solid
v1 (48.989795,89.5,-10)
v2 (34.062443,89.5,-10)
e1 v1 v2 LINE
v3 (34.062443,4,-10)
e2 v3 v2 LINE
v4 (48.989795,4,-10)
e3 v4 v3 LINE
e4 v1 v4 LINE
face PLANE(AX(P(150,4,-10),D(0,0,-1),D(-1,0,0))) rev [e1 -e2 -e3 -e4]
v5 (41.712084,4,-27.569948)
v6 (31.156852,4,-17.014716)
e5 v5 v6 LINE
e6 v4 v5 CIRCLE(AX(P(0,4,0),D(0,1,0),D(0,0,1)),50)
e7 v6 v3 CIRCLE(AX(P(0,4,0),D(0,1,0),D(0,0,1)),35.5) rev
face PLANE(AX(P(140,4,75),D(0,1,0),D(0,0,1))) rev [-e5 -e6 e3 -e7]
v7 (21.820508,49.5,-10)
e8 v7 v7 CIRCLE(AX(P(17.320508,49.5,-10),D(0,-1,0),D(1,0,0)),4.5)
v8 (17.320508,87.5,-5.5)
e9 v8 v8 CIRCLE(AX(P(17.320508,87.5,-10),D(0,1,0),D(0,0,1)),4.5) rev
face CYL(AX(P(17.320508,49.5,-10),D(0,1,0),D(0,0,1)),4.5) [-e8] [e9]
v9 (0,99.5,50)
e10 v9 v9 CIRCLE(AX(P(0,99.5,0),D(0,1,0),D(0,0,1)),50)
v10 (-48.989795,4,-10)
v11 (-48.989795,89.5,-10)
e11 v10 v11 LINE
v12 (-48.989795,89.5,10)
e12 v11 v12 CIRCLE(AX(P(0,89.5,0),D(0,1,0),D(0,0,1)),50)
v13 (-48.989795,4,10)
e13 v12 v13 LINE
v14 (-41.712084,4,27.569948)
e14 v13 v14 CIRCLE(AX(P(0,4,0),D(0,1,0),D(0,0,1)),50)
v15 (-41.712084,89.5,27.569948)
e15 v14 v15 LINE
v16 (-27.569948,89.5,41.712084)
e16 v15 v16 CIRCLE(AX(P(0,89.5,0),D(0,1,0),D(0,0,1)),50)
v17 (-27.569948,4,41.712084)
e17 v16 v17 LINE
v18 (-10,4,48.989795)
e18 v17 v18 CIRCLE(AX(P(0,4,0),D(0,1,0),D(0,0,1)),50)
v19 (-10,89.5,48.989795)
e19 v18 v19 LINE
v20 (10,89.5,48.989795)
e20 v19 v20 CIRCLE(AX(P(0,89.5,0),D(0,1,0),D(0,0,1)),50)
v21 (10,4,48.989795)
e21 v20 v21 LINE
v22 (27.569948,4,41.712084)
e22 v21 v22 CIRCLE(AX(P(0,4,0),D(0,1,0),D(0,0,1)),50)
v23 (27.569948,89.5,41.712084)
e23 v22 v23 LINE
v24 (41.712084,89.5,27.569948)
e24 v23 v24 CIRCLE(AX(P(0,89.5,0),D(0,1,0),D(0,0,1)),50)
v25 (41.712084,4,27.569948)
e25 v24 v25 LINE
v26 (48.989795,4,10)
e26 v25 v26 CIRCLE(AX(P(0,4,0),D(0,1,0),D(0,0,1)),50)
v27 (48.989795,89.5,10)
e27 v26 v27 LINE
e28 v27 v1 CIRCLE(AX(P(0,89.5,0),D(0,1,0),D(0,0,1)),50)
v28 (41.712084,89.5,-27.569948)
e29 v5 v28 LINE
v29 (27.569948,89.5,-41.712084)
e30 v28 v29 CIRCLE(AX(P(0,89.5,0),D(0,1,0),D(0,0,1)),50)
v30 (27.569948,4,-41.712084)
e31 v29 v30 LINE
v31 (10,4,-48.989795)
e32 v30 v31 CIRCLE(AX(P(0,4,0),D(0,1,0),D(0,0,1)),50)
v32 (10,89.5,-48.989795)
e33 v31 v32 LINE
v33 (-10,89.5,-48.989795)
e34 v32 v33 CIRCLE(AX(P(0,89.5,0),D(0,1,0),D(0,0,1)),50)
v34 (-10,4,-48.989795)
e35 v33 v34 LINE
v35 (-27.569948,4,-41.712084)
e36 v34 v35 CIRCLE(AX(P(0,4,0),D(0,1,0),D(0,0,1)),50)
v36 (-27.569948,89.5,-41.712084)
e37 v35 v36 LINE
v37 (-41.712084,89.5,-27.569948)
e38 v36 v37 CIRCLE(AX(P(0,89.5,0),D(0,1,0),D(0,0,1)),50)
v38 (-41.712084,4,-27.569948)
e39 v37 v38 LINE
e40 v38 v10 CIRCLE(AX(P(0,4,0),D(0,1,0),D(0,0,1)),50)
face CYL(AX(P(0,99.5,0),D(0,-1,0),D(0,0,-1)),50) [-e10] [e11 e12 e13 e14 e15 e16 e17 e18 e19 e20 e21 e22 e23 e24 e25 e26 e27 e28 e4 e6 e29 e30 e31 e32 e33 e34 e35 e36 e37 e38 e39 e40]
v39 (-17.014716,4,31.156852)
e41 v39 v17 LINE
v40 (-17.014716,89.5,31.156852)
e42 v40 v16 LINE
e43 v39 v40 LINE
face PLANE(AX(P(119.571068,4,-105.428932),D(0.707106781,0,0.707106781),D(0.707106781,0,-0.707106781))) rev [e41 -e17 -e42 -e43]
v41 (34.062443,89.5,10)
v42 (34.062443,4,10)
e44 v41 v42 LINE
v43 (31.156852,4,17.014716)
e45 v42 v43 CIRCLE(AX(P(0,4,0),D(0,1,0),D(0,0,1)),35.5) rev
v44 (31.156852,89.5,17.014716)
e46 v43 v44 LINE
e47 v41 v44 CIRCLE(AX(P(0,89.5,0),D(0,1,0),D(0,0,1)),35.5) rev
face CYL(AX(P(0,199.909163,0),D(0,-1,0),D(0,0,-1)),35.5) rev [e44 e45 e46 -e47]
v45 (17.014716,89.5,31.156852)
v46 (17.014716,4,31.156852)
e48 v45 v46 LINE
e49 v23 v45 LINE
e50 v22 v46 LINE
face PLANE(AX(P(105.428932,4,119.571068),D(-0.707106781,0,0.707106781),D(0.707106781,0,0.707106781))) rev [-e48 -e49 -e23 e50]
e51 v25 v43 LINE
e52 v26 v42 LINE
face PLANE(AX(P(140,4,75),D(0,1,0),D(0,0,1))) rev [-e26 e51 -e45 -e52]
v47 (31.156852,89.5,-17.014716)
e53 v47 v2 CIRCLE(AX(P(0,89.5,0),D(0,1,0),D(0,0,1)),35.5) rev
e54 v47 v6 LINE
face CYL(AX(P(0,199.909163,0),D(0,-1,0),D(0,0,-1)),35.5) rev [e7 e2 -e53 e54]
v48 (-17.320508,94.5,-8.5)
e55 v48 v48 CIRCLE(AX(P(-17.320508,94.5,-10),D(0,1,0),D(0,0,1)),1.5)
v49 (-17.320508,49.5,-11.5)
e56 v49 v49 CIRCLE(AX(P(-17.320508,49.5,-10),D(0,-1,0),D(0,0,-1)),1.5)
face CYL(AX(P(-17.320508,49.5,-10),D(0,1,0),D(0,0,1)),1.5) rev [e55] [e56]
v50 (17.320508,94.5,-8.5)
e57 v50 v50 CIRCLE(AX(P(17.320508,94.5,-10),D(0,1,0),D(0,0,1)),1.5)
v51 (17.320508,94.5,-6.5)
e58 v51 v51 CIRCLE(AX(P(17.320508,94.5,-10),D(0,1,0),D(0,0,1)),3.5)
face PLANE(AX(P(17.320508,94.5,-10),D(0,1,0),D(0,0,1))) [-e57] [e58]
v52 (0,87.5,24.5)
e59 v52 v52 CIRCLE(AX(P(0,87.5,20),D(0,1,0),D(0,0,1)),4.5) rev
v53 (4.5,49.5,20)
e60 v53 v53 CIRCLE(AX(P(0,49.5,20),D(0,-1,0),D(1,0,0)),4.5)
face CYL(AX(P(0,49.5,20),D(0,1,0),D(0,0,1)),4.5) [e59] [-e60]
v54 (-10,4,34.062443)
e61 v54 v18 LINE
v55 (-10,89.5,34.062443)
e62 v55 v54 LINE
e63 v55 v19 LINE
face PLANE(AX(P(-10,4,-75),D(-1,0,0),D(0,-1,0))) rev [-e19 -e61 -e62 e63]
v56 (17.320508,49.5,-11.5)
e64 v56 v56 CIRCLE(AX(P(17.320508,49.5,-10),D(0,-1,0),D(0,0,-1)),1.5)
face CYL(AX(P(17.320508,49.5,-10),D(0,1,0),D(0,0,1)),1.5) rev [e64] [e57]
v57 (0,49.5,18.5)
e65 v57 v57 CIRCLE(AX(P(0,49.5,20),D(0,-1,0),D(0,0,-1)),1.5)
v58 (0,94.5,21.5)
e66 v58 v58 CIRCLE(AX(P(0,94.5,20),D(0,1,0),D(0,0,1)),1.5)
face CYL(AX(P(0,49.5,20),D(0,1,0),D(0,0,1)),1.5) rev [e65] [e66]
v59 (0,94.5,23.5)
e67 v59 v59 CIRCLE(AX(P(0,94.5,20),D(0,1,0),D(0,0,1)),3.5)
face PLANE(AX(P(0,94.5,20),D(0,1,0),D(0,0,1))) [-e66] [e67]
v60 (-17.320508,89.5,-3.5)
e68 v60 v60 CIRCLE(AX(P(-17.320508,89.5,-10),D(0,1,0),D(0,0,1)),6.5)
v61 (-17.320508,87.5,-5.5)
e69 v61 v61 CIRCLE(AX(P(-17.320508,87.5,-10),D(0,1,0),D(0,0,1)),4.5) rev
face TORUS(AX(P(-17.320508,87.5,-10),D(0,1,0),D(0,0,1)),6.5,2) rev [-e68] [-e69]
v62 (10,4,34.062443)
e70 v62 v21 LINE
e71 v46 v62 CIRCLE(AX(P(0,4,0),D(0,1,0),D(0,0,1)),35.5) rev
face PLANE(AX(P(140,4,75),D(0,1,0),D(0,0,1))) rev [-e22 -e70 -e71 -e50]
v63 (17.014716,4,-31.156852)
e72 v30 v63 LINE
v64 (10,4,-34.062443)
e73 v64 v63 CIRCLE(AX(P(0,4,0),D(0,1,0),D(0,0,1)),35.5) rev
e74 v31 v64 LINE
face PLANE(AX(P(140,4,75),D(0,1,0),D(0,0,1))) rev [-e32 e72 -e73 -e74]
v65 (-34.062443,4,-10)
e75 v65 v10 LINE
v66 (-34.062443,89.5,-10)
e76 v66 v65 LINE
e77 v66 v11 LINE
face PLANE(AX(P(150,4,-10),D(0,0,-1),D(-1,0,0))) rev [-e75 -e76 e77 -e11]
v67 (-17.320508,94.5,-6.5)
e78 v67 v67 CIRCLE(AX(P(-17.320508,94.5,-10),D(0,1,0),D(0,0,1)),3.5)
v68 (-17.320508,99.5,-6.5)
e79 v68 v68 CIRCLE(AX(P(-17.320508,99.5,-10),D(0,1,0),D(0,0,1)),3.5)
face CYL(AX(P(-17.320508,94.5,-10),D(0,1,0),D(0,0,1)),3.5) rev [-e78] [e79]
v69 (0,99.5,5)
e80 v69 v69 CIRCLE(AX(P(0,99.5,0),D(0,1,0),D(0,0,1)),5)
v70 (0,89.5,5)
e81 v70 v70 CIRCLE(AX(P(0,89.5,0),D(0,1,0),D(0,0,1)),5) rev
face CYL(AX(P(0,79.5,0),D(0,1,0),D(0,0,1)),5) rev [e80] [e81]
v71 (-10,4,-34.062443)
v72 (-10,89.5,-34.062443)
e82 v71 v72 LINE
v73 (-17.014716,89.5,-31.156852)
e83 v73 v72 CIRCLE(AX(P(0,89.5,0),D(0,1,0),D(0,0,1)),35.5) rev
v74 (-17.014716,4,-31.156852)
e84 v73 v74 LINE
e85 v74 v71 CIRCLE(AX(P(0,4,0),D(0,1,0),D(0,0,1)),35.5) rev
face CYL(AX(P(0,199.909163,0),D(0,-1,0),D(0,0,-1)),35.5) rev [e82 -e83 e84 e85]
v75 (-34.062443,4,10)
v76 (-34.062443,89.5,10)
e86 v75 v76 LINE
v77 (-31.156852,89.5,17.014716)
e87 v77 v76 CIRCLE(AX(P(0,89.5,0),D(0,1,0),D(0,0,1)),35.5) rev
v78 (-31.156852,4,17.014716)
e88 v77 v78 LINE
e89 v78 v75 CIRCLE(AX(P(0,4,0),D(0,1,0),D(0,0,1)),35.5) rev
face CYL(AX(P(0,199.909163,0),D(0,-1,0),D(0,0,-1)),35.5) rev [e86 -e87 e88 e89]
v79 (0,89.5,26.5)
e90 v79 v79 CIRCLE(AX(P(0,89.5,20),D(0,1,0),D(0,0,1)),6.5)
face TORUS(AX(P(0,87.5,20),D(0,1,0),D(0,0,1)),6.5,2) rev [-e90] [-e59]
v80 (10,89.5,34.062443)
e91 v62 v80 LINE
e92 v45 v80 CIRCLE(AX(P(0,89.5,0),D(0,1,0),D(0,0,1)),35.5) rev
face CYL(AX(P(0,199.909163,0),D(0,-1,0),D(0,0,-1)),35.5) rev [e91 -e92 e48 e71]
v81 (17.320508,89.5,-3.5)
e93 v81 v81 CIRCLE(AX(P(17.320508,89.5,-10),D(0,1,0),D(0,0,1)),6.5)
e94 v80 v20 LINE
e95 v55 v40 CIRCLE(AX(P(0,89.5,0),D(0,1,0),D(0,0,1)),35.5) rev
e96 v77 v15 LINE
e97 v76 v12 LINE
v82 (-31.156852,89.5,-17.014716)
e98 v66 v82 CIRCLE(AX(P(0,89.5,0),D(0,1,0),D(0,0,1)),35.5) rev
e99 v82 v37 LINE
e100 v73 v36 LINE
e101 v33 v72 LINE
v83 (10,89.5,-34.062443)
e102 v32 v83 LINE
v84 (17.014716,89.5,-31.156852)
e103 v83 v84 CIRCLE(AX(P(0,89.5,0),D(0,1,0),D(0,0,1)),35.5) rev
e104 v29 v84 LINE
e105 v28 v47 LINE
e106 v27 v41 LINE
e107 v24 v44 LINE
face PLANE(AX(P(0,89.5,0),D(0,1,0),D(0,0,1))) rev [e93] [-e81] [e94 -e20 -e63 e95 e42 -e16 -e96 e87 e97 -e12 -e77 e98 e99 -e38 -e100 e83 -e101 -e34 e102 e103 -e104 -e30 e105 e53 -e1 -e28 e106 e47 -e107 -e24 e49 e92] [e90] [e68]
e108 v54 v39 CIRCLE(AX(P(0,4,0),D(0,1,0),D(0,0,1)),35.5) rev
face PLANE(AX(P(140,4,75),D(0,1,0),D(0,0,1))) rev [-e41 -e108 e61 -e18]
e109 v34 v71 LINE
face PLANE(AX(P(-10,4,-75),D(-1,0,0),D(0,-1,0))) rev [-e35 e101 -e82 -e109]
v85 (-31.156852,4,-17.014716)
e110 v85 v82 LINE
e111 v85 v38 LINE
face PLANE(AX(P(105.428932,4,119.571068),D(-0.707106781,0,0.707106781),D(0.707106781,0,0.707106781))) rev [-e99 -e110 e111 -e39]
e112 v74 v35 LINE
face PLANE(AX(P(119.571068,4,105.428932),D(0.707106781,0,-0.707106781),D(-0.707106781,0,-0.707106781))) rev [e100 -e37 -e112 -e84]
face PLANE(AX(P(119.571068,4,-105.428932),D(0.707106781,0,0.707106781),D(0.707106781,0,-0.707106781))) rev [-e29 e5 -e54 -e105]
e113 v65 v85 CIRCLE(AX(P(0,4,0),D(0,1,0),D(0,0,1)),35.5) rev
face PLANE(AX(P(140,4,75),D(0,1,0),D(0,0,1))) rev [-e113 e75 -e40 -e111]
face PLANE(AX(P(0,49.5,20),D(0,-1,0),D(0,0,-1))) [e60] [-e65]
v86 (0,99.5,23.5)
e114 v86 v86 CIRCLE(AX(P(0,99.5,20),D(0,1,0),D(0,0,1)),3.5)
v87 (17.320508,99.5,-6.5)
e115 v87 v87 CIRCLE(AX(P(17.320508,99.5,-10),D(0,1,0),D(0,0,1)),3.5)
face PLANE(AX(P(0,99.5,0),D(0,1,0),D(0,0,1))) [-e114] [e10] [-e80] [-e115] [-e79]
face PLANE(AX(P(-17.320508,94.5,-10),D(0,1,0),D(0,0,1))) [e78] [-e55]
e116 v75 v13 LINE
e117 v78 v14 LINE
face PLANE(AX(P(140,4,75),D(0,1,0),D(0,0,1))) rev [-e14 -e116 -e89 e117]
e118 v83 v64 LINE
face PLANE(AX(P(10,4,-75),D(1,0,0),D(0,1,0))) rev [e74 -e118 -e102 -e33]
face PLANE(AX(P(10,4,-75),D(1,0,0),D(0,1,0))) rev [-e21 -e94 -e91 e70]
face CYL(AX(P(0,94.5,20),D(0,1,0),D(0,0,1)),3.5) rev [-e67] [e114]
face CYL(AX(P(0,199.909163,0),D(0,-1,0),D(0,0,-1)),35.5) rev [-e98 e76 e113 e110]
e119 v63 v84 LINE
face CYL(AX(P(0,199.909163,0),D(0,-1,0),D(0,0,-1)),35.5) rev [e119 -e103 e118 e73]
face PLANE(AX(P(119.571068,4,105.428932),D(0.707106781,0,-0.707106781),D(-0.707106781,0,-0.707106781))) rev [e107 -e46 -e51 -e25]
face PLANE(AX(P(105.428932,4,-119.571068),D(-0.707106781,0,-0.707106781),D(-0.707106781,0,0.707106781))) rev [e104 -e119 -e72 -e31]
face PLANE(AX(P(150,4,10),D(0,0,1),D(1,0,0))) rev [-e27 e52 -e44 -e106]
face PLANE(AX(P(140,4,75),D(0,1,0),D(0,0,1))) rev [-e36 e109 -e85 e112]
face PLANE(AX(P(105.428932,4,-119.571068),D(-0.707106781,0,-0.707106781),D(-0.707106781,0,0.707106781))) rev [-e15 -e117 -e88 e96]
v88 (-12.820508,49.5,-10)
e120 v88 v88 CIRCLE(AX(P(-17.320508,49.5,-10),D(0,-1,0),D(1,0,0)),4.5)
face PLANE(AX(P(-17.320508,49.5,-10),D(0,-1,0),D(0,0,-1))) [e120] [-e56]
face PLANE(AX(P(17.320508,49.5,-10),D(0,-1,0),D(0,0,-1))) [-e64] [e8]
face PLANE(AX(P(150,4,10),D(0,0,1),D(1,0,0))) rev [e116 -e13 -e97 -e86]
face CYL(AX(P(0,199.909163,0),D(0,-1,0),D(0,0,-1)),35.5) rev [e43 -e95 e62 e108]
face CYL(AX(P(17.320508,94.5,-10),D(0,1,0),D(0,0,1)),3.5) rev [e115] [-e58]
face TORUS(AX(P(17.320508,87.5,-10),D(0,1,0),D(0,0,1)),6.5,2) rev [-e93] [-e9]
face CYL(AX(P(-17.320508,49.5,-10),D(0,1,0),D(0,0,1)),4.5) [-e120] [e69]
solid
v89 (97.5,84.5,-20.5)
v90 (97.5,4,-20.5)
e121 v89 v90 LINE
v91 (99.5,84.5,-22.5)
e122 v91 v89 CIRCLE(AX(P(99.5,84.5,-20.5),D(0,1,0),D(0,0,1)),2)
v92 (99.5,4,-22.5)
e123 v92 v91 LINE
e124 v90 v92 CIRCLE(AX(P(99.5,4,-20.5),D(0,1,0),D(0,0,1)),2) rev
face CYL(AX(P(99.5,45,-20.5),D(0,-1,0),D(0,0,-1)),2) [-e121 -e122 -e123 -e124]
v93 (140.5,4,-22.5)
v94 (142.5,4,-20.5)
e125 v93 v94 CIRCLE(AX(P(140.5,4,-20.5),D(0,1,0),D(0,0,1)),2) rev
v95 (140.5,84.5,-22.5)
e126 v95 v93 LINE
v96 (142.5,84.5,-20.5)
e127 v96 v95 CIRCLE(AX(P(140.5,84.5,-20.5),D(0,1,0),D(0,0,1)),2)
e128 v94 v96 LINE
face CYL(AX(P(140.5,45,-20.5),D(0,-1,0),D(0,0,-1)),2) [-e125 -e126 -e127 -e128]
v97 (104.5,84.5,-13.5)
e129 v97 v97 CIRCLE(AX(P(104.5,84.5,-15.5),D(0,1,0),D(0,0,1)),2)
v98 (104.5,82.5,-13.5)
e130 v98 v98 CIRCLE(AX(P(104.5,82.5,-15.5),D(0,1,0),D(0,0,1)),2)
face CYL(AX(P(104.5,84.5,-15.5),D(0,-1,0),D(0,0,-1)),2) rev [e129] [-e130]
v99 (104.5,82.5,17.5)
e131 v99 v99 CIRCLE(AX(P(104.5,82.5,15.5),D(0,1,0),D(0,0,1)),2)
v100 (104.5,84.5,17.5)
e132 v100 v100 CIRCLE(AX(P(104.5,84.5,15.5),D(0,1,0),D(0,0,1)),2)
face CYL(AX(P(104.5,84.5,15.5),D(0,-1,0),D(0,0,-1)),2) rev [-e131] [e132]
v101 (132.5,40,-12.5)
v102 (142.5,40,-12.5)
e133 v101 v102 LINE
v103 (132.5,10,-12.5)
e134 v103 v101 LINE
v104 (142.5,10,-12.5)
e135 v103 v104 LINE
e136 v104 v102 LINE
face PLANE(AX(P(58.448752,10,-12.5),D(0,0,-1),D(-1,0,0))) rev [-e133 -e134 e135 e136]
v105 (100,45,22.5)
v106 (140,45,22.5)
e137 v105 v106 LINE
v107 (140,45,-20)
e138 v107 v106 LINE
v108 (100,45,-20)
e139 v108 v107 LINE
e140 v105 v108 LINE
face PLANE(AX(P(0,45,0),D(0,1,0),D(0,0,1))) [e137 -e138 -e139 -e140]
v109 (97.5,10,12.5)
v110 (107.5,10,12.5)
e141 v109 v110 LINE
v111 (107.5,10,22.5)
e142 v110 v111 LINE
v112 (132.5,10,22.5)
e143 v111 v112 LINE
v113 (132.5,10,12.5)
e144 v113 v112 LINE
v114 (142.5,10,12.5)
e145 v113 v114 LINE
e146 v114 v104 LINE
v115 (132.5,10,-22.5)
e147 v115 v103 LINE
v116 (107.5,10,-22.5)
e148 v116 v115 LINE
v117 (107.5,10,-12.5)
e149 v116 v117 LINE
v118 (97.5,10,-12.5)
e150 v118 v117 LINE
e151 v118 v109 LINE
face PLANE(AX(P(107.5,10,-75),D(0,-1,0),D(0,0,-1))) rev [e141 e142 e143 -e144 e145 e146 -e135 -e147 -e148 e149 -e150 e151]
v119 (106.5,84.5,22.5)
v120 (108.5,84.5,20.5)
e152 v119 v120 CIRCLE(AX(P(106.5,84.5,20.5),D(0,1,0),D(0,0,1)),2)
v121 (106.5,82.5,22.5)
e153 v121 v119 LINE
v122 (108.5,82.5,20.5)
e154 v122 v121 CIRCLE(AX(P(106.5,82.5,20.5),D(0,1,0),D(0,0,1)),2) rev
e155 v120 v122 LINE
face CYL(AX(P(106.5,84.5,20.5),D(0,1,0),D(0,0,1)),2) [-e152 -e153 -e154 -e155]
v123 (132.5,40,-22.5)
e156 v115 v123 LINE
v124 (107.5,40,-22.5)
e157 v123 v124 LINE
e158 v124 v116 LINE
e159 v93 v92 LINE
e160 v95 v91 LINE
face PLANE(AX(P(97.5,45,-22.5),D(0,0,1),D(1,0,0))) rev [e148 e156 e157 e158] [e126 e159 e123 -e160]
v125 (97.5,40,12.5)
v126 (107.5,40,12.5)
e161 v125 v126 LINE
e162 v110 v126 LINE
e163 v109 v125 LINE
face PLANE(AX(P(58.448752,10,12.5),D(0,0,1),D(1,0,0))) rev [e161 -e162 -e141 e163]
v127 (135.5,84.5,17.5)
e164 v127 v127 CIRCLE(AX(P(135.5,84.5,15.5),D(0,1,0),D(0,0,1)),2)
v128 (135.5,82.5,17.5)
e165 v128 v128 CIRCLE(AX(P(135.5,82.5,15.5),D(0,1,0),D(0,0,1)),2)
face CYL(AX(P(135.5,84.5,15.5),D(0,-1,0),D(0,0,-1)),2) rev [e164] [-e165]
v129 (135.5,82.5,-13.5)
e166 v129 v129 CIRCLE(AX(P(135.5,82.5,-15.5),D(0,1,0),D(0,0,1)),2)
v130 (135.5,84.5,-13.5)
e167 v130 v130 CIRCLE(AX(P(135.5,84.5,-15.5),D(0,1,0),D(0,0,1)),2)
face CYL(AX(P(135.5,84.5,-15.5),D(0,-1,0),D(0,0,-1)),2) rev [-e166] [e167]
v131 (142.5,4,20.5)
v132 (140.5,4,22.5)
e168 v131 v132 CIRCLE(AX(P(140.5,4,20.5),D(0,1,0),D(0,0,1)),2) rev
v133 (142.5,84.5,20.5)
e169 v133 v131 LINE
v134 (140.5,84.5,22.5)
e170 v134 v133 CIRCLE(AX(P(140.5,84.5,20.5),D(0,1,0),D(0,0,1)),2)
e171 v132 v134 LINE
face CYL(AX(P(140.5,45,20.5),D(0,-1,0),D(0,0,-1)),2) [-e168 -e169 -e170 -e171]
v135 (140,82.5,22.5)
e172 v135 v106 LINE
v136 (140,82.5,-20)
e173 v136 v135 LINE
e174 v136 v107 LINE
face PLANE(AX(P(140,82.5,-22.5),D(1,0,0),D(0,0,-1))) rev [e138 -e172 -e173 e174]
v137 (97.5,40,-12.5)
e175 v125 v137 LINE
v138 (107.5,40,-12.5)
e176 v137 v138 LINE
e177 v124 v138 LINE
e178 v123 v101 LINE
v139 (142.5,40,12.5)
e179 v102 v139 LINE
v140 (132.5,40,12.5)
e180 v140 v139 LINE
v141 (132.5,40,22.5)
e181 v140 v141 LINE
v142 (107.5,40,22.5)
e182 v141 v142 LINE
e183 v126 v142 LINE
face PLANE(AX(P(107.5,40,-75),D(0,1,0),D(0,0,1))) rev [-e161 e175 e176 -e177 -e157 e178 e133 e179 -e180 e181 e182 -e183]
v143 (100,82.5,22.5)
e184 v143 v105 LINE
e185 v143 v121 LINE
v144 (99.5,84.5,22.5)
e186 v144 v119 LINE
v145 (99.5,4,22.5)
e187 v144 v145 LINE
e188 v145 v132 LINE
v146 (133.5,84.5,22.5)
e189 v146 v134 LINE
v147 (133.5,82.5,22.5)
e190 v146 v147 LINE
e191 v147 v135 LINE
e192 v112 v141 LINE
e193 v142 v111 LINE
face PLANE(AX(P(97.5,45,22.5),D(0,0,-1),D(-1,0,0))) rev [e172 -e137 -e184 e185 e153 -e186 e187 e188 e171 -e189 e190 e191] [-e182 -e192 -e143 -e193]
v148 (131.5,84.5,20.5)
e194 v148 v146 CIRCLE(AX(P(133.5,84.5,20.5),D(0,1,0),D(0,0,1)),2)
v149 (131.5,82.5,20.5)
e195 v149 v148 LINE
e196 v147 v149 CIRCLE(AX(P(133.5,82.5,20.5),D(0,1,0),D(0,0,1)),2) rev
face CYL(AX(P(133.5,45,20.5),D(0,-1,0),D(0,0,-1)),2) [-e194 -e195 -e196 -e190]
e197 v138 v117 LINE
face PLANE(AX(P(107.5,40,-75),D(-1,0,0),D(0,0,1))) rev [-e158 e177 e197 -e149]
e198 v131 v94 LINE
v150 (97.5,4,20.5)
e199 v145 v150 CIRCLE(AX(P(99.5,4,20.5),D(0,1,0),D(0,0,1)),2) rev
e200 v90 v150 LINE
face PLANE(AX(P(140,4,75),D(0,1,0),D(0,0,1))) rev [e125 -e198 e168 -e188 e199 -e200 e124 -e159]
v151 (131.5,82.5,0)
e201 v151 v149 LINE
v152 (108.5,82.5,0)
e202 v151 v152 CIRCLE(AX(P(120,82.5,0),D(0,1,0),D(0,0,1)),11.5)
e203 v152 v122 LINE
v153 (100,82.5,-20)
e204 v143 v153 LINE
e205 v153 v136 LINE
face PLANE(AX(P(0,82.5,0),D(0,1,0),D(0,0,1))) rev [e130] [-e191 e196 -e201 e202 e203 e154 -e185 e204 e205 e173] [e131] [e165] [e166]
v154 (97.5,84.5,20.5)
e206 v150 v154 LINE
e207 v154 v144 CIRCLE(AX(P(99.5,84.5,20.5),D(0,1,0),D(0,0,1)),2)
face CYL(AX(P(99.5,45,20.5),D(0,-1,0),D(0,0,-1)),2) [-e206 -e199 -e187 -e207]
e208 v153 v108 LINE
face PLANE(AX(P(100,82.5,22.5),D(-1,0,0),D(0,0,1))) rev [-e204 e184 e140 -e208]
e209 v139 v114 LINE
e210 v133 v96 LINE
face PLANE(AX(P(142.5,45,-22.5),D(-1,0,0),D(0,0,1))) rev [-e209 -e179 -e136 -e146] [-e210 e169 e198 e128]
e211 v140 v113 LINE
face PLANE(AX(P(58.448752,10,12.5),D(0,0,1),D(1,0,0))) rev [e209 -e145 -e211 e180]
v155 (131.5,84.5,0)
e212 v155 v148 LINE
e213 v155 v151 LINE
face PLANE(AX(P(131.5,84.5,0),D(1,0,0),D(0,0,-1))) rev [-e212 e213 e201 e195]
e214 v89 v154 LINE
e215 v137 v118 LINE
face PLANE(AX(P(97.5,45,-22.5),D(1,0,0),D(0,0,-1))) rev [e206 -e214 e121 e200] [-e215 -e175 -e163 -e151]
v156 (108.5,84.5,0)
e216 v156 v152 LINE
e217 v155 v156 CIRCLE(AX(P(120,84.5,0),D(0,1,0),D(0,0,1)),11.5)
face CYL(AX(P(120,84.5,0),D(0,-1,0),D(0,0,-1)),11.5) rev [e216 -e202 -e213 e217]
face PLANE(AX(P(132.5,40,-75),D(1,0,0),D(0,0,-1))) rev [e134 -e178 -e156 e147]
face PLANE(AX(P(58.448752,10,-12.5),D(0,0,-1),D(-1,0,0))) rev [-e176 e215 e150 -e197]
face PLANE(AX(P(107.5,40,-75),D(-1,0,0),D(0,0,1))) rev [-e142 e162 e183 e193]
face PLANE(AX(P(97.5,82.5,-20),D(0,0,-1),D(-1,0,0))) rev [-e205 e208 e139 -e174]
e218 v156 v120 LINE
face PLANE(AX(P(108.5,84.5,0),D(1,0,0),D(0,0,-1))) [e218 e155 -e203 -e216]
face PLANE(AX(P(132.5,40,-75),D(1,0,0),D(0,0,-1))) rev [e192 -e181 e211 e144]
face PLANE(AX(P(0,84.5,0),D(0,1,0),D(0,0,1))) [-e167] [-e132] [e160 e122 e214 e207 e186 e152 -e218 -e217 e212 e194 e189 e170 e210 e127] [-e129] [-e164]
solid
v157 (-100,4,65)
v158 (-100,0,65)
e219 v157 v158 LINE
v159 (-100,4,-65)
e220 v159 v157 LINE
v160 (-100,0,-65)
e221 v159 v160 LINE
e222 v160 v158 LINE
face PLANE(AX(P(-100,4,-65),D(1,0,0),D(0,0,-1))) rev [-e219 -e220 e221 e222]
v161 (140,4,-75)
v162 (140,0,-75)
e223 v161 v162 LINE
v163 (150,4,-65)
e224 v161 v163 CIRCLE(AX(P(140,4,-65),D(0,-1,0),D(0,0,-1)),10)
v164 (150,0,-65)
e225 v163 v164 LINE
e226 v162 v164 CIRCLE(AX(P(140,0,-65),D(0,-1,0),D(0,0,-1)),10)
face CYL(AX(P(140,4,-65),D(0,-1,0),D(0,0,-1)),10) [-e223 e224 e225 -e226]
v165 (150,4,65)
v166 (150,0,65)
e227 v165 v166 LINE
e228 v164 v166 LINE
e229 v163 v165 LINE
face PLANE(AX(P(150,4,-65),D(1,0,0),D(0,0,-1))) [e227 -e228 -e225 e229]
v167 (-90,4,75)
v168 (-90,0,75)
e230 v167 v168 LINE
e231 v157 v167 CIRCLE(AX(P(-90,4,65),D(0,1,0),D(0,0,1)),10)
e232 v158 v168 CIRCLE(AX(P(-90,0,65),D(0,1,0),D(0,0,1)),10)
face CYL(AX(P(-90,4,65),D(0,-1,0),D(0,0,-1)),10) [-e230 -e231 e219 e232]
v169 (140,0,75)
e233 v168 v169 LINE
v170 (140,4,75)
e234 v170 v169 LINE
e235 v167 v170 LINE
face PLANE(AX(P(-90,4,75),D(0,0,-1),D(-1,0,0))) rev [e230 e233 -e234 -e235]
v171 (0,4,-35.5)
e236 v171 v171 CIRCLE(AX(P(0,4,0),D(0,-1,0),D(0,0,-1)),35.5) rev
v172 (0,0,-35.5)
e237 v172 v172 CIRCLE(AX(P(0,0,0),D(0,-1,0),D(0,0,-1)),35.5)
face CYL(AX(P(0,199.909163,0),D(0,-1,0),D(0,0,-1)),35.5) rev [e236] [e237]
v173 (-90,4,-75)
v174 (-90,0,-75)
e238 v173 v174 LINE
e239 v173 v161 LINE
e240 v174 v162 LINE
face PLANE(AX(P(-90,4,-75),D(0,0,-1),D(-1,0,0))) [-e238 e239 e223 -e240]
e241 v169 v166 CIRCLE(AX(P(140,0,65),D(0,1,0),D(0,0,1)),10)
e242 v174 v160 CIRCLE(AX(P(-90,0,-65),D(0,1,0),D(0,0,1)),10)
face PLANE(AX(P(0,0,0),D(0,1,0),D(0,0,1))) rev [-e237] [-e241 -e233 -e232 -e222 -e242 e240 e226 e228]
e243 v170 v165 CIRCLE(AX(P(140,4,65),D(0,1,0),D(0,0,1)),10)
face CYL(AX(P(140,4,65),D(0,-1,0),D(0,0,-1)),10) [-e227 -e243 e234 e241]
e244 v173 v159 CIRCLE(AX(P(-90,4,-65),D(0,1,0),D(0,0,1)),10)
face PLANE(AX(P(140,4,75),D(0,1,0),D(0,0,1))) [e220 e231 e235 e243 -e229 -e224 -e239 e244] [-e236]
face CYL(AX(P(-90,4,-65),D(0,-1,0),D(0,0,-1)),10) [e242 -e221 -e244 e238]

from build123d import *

# Parameters (mm, degrees)
SKETCH1_R            = 50
BOSS_EXTRUDE1_DEPTH  = 99.5
BOSS_EXTRUDE2_DEPTH  = 4
SKETCH3_R            = 5
CUT_EXTRUDE1_DEPTH   = 20
SKETCH6_R            = 35.5
CUT_EXTRUDE2_DEPTH   = 89.5
SKETCH7_W            = 20
SKETCH7_H            = 85.5
CUT_EXTRUDE3_DEPTH   = 196.000641025
CIRPATTERN1_COUNT    = 8
SKETCH8_R            = 4.5
SKETCH8_R_2          = 1.5
EXTRUDE_THIN1_DEPTH  = 40
SKETCH8_2_R          = 1.5
CUT_EXTRUDE4_DEPTH   = 191.092740524
SKETCH9_R            = 3.5
CUT_EXTRUDE5_DEPTH   = 5
FILLET1_R            = 2
SKETCH4_W            = 45
SKETCH4_H            = 45
BOSS_EXTRUDE3_DEPTH  = 41
EXTRUDE_THIN2_DEPTH  = 37.5
SKETCH11_R           = 2
BOSS_EXTRUDE4_DEPTH  = 2
FILLET2_R            = 2
SKETCH12_W           = 25
SKETCH12_H           = 30
CUT_EXTRUDE6_DEPTH   = 205.710771578
CUT_EXTRUDE7_REACH   = 274.638
SKETCH13_W           = 25
SKETCH13_H           = 30
SPLIT1_START         = 4
SPLIT1_OUTLINE_R     = 50
SPLIT1_OUTLINE_R_2   = 5
SPLIT1_OUTLINE_R_3   = 1.5
SPLIT1_DEPTH         = 95.5
SPLIT1_2_DEPTH       = 95.5
SPLIT1_START_2       = 89.5
SPLIT1_3_OUTLINE_R   = 3.5
SPLIT1_3_OUTLINE_R_2 = 5
SPLIT1_3_DEPTH       = 10
SPLIT1_START_3       = 49.5
SPLIT1_4_OUTLINE_R   = 4.5
SPLIT1_4_OUTLINE_R_2 = 1.5
SPLIT1_4_DEPTH       = 45
SPLIT1_8_DEPTH       = 41
SPLIT1_START_4       = 40
SPLIT1_9_DEPTH       = 44.5
SPLIT1_10_DEPTH      = 6
SPLIT1_11_DEPTH      = 5
SPLIT1_START_5       = 82.5
SPLIT1_12_OUTLINE_R  = 2
SPLIT1_12_DEPTH      = 2


with BuildPart() as part:
    # Sketch1 → Boss-Extrude1 (new body)
    with BuildSketch(Plane(origin=(0, 0, 0), x_dir=(1, 0, 0), z_dir=(0, 1, 0))):
        with Locations(Location((0, 0, 0), (0, 0, 270))):
            Circle(SKETCH1_R)
    extrude(amount=BOSS_EXTRUDE1_DEPTH)

    # Sketch2 → Boss-Extrude2 (add)
    with BuildSketch(Plane(origin=(0, 0, 0), x_dir=(1, 0, 0), z_dir=(0, 1, 0))):
        with BuildLine():
            Line((-90, 75), (140, 75))
            ThreePointArc((140, 75), (147.071067812, 72.071067812), (150, 65))
            Line((150, 65), (150, -65))
            ThreePointArc((150, -65), (147.071067812, -72.071067812), (140, -75))
            Line((140, -75), (-90, -75))
            ThreePointArc((-90, -75), (-97.071067812, -72.071067812), (-100, -65))
            Line((-100, -65), (-100, 65))
            ThreePointArc((-100, 65), (-97.071067812, 72.071067812), (-90, 75))
        make_face()
    extrude(amount=BOSS_EXTRUDE2_DEPTH)

    # Sketch3 → Cut-Extrude1 (cut)
    with BuildSketch(Plane(origin=(0, 99.5, 0), x_dir=(1, 0, 0), z_dir=(0, 1, 0))):
        with Locations(Location((0, 0, 0), (0, 0, 270))):
            Circle(SKETCH3_R)
    extrude(amount=-CUT_EXTRUDE1_DEPTH, mode=Mode.SUBTRACT)

    # Sketch6 → Cut-Extrude2 (cut)
    with BuildSketch(Plane.XZ):
        with Locations(Location((0, 0, 0), (0, 0, 270))):
            Circle(SKETCH6_R)
    extrude(amount=-CUT_EXTRUDE2_DEPTH, mode=Mode.SUBTRACT)

    # Sketch7 → Cut-Extrude3 (cut, symmetric)
    with BuildSketch(Plane.XY):
        with Locations((0, 46.75)):
            Rectangle(SKETCH7_W, SKETCH7_H)
    cut_extrude3 = extrude(amount=CUT_EXTRUDE3_DEPTH, both=True, mode=Mode.SUBTRACT)

    # CirPattern1: Cut-Extrude3 ×8 about axis
    cirpattern1_axis = Axis((0, 0, 0), (0, 1, 0))
    for i in range(1, CIRPATTERN1_COUNT):
        add(cut_extrude3.rotate(cirpattern1_axis, i * 360 / CIRPATTERN1_COUNT), mode=Mode.SUBTRACT)

    # Sketch8 → Extrude-Thin1 (add)
    # profile 1 of 3: a face of its own
    with BuildSketch(Plane.XZ.offset(-89.5)):
        with Locations((0, 20)):
            Circle(SKETCH8_R)
        with Locations((0, 20)):
            Circle(SKETCH8_R_2, mode=Mode.SUBTRACT)
    # profile 2 of 3: a face of its own
    with BuildSketch(Plane.XZ.offset(-89.5)):
        with Locations((17.320508076, -10)):
            Circle(SKETCH8_R)
        with Locations((17.320508076, -10)):
            Circle(SKETCH8_R_2, mode=Mode.SUBTRACT)
    # profile 3 of 3: a face of its own
    with BuildSketch(Plane.XZ.offset(-89.5)):
        with Locations((-17.320508076, -10)):
            Circle(SKETCH8_R)
        with Locations((-17.320508076, -10)):
            Circle(SKETCH8_R_2, mode=Mode.SUBTRACT)
    extrude(amount=EXTRUDE_THIN1_DEPTH)

    # Sketch8<2> → Cut-Extrude4 (cut, through all)
    with BuildSketch(Plane.XZ.offset(-89.5)):
        with Locations(Location((0, 20, 0), (0, 0, 270))):
            Circle(SKETCH8_2_R)
        with Locations(Location((17.320508076, -10, 0), (0, 0, 270))):
            Circle(SKETCH8_2_R)
        with Locations(Location((-17.320508076, -10, 0), (0, 0, 270))):
            Circle(SKETCH8_2_R)
    extrude(amount=-CUT_EXTRUDE4_DEPTH, mode=Mode.SUBTRACT)

    # Sketch9 → Cut-Extrude5 (cut)
    with BuildSketch(Plane(origin=(0, 99.5, 0), x_dir=(1, 0, 0), z_dir=(0, 1, 0))):
        with Locations(Location((0, -20, 0), (0, 0, 270))):
            Circle(SKETCH9_R)
        with Locations(Location((-17.320508076, 10, 0), (0, 0, 270))):
            Circle(SKETCH9_R)
        with Locations(Location((17.320508076, 10, 0), (0, 0, 270))):
            Circle(SKETCH9_R)
    extrude(amount=-CUT_EXTRUDE5_DEPTH, mode=Mode.SUBTRACT)

    # Fillet1
    fillet1_edges = [part.edges().sort_by_distance(p)[0] for p in [
        (-4.5, 89.5, 20),
        (12.820508076, 89.5, -10),
        (-21.820508076, 89.5, -10),
    ]]
    fillet(fillet1_edges, radius=FILLET1_R)

    # Sketch4 → Boss-Extrude3 (add)
    with BuildSketch(Plane(origin=(0, 4, 0), x_dir=(1, 0, 0), z_dir=(0, 1, 0))):
        with Locations((120, 0)):
            Rectangle(SKETCH4_W, SKETCH4_H)
    extrude(amount=BOSS_EXTRUDE3_DEPTH)

    # Sketch10 → Extrude-Thin2 (add)
    with BuildSketch(Plane(origin=(0, 45, 0), x_dir=(1, 0, 0), z_dir=(0, 1, 0))):
        Polygon((97.5, -22.5), (97.5, 22.5), (142.5, 22.5), (142.5, -22.5), (140, -22.5), (140, 20), (100, 20), (100, -22.5), align=None)
    extrude(amount=EXTRUDE_THIN2_DEPTH)

    # Sketch11 → Boss-Extrude4 (add)
    # profile 1 of 2: a face of its own
    with BuildSketch(Plane(origin=(0, 82.5, 0), x_dir=(1, 0, 0), z_dir=(0, 1, 0))):
        Polygon((100, 20), (140, 20), (140, -22.5), (142.5, -22.5), (142.5, 22.5), (97.5, 22.5), (97.5, -22.5), (100, -22.5), align=None)
    # profile 2 of 2: a face of its own
    with BuildSketch(Plane(origin=(0, 82.5, 0), x_dir=(1, 0, 0), z_dir=(0, 1, 0))):
        with BuildLine():
            Line((108.5, -22.5), (108.5, 0))
            ThreePointArc((108.5, 0), (120, 11.5), (131.5, 0))
            Line((131.5, 0), (131.5, -22.5))
            Line((131.5, -22.5), (140, -22.5))
            Line((140, -22.5), (140, 20))
            Line((140, 20), (100, 20))
            Line((100, 20), (100, -22.5))
            Line((100, -22.5), (108.5, -22.5))
        make_face()
        with Locations(Location((104.5, -15.5, 0), (0, 0, 270))):
            Circle(SKETCH11_R, mode=Mode.SUBTRACT)
        with Locations(Location((135.5, -15.5, 0), (0, 0, 270))):
            Circle(SKETCH11_R, mode=Mode.SUBTRACT)
        with Locations(Location((104.5, 15.5, 0), (0, 0, 270))):
            Circle(SKETCH11_R, mode=Mode.SUBTRACT)
        with Locations(Location((135.5, 15.5, 0), (0, 0, 270))):
            Circle(SKETCH11_R, mode=Mode.SUBTRACT)
    extrude(amount=BOSS_EXTRUDE4_DEPTH)

    # Fillet2
    fillet2_edges = [part.edges().sort_by_distance(p)[0] for p in [
        (142.5, 44.25, 22.5),
        (142.5, 44.25, -22.5),
        (97.5, 44.25, -22.5),
        (97.5, 44.25, 22.5),
        (131.5, 83.5, 22.5),
        (108.5, 83.5, 22.5),
    ]]
    fillet(fillet2_edges, radius=FILLET2_R)

    # Sketch12 → Cut-Extrude6 (cut, through all)
    with BuildSketch(Plane.XY.offset(22.5)):
        with Locations((120, 25)):
            Rectangle(SKETCH12_W, SKETCH12_H)
    extrude(amount=-CUT_EXTRUDE6_DEPTH, mode=Mode.SUBTRACT)

    # Cut-Extrude7: up to this face of the body (flat: up to its plane)
    cut_extrude7_end = Plane(part.part.faces().sort_by_distance((97.5, 44.25, 0))[0])
    # Sketch13 → Cut-Extrude7 (cut, up to the picked face)
    with BuildSketch(Plane(origin=(142.5, 0, 0), x_dir=(0, 0, -1), z_dir=(1, 0, 0)), mode=Mode.PRIVATE) as cut_extrude7_sk1:
        with Locations((0, 25)):
            Rectangle(SKETCH13_W, SKETCH13_H)
    cut_extrude7_tool1 = split(extrude(cut_extrude7_sk1.sketch, amount=-CUT_EXTRUDE7_REACH, mode=Mode.PRIVATE), bisect_by=cut_extrude7_end, keep=Keep.BOTH, mode=Mode.PRIVATE)
    add(cut_extrude7_tool1.solids().sort_by(Axis((142.5, 25, 0), (-1, 0, 0)))[0], mode=Mode.SUBTRACT)

    # Split1: read off the stored shape, not the designer's step
    # Split1 outline → Split1 (cut)
    # profile 1 of 2: a face of its own
    with BuildSketch(Plane(origin=(0, 0, 0), x_dir=(1, 0, 0), z_dir=(0, 1, 0)).offset(SPLIT1_START)):
        with BuildLine():
            ThreePointArc((142.5, 20.5), (141.914213562, 21.914213562), (140.5, 22.5))
            Line((140.5, 22.5), (99.5, 22.5))
            ThreePointArc((99.5, 22.5), (98.085786438, 21.914213562), (97.5, 20.5))
            Line((97.5, 20.5), (97.5, -20.5))
            ThreePointArc((97.5, -20.5), (98.085786438, -21.914213562), (99.5, -22.5))
            Line((99.5, -22.5), (140.5, -22.5))
            ThreePointArc((140.5, -22.5), (141.914213562, -21.914213562), (142.5, -20.5))
            Line((142.5, -20.5), (142.5, 20.5))
        make_face()
    # profile 2 of 2: a face of its own
    with BuildSketch(Plane(origin=(0, 0, 0), x_dir=(1, 0, 0), z_dir=(0, 1, 0)).offset(SPLIT1_START)):
        Circle(SPLIT1_OUTLINE_R)
        Circle(SPLIT1_OUTLINE_R_2, mode=Mode.SUBTRACT)
        with Locations((17.320508076, 10)):
            Circle(SPLIT1_OUTLINE_R_3, mode=Mode.SUBTRACT)
        with Locations((-17.320508076, 10)):
            Circle(SPLIT1_OUTLINE_R_3, mode=Mode.SUBTRACT)
        with Locations((0, -20)):
            Circle(SPLIT1_OUTLINE_R_3, mode=Mode.SUBTRACT)
    extrude(amount=SPLIT1_DEPTH, mode=Mode.SUBTRACT)


with BuildPart() as body_2:
    # Split1 2 outline → Split1 2 (new body)
    with BuildSketch(Plane(origin=(0, 0, 0), x_dir=(1, 0, 0), z_dir=(0, 1, 0)).offset(SPLIT1_START)):
        with BuildLine():
            Line((48.989794856, -10), (34.062442661, -10))
            ThreePointArc((34.062442661, -10), (32.797723404, -13.585261849), (31.156852001, -17.014716377))
            Line((31.156852001, -17.014716377), (41.712083963, -27.56994834))
            ThreePointArc((41.712083963, -27.56994834), (46.193976625, -19.134171618), (48.989794856, -10))
        make_face()
        with BuildLine():
            ThreePointArc((10, -48.989794856), (19.134171618, -46.193976625), (27.56994834, -41.712083963))
            Line((27.56994834, -41.712083963), (17.014716377, -31.156852001))
            ThreePointArc((17.014716377, -31.156852001), (13.585261849, -32.797723404), (10, -34.062442661))
            Line((10, -34.062442661), (10, -48.989794856))
        make_face()
        with BuildLine():
            Line((34.062442661, 10), (48.989794856, 10))
            ThreePointArc((48.989794856, 10), (46.193976625, 19.134171618), (41.712083963, 27.56994834))
            Line((41.712083963, 27.56994834), (31.156852001, 17.014716377))
            ThreePointArc((31.156852001, 17.014716377), (32.797723404, 13.585261849), (34.062442661, 10))
        make_face()
        with BuildLine():
            ThreePointArc((-27.56994834, -41.712083963), (-19.134171618, -46.193976625), (-10, -48.989794856))
            Line((-10, -48.989794856), (-10, -34.062442661))
            ThreePointArc((-10, -34.062442661), (-13.585261849, -32.797723404), (-17.014716377, -31.156852001))
            Line((-17.014716377, -31.156852001), (-27.56994834, -41.712083963))
        make_face()
        with BuildLine():
            Line((17.014716377, 31.156852001), (27.56994834, 41.712083963))
            ThreePointArc((27.56994834, 41.712083963), (19.134171618, 46.193976625), (10, 48.989794856))
            Line((10, 48.989794856), (10, 34.062442661))
            ThreePointArc((10, 34.062442661), (13.585261849, 32.797723404), (17.014716377, 31.156852001))
        make_face()
        with BuildLine():
            ThreePointArc((-48.989794856, -10), (-46.193976625, -19.134171618), (-41.712083963, -27.56994834))
            Line((-41.712083963, -27.56994834), (-31.156852001, -17.014716377))
            ThreePointArc((-31.156852001, -17.014716377), (-32.797723404, -13.585261849), (-34.062442661, -10))
            Line((-34.062442661, -10), (-48.989794856, -10))
        make_face()
        with BuildLine():
            Line((-10, 34.062442661), (-10, 48.989794856))
            ThreePointArc((-10, 48.989794856), (-19.134171618, 46.193976625), (-27.56994834, 41.712083963))
            Line((-27.56994834, 41.712083963), (-17.014716377, 31.156852001))
            ThreePointArc((-17.014716377, 31.156852001), (-13.585261849, 32.797723404), (-10, 34.062442661))
        make_face()
        with BuildLine():
            ThreePointArc((-41.712083963, 27.56994834), (-46.193976625, 19.134171618), (-48.989794856, 10))
            Line((-48.989794856, 10), (-34.062442661, 10))
            ThreePointArc((-34.062442661, 10), (-32.797723404, 13.585261849), (-31.156852001, 17.014716377))
            Line((-31.156852001, 17.014716377), (-41.712083963, 27.56994834))
        make_face()
    extrude(amount=SPLIT1_2_DEPTH)

    # Split1 3 outline → Split1 3 (add)
    with BuildSketch(Plane(origin=(0, 0, 0), x_dir=(1, 0, 0), z_dir=(0, 1, 0)).offset(SPLIT1_START_2)):
        with BuildLine():
            ThreePointArc((31.156852001, -17.014716377), (32.797723404, -13.585261849), (34.062442661, -10))
            Line((34.062442661, -10), (48.989794856, -10))
            ThreePointArc((48.989794856, -10), (50, 0), (48.989794856, 10))
            Line((48.989794856, 10), (34.062442661, 10))
            ThreePointArc((34.062442661, 10), (32.797723404, 13.585261849), (31.156852001, 17.014716377))
            Line((31.156852001, 17.014716377), (41.712083963, 27.56994834))
            ThreePointArc((41.712083963, 27.56994834), (35.355339059, 35.355339059), (27.56994834, 41.712083963))
            Line((27.56994834, 41.712083963), (17.014716377, 31.156852001))
            ThreePointArc((17.014716377, 31.156852001), (13.585261849, 32.797723404), (10, 34.062442661))
            Line((10, 34.062442661), (10, 48.989794856))
            ThreePointArc((10, 48.989794856), (0, 50), (-10, 48.989794856))
            Line((-10, 48.989794856), (-10, 34.062442661))
            ThreePointArc((-10, 34.062442661), (-13.585261849, 32.797723404), (-17.014716377, 31.156852001))
            Line((-17.014716377, 31.156852001), (-27.56994834, 41.712083963))
            ThreePointArc((-27.56994834, 41.712083963), (-35.355339059, 35.355339059), (-41.712083963, 27.56994834))
            Line((-41.712083963, 27.56994834), (-31.156852001, 17.014716377))
            ThreePointArc((-31.156852001, 17.014716377), (-32.797723404, 13.585261849), (-34.062442661, 10))
            Line((-34.062442661, 10), (-48.989794856, 10))
            ThreePointArc((-48.989794856, 10), (-50, 0), (-48.989794856, -10))
            Line((-48.989794856, -10), (-34.062442661, -10))
            ThreePointArc((-34.062442661, -10), (-32.797723404, -13.585261849), (-31.156852001, -17.014716377))
            Line((-31.156852001, -17.014716377), (-41.712083963, -27.56994834))
            ThreePointArc((-41.712083963, -27.56994834), (-35.355339059, -35.355339059), (-27.56994834, -41.712083963))
            Line((-27.56994834, -41.712083963), (-17.014716377, -31.156852001))
            ThreePointArc((-17.014716377, -31.156852001), (-13.585261849, -32.797723404), (-10, -34.062442661))
            Line((-10, -34.062442661), (-10, -48.989794856))
            ThreePointArc((-10, -48.989794856), (0, -50), (10, -48.989794856))
            Line((10, -48.989794856), (10, -34.062442661))
            ThreePointArc((10, -34.062442661), (13.585261849, -32.797723404), (17.014716377, -31.156852001))
            Line((17.014716377, -31.156852001), (27.56994834, -41.712083963))
            ThreePointArc((27.56994834, -41.712083963), (35.355339059, -35.355339059), (41.712083963, -27.56994834))
            Line((41.712083963, -27.56994834), (31.156852001, -17.014716377))
        make_face()
        with Locations((0, -20)):
            Circle(SPLIT1_3_OUTLINE_R, mode=Mode.SUBTRACT)
        Circle(SPLIT1_3_OUTLINE_R_2, mode=Mode.SUBTRACT)
        with Locations((17.320508076, 10)):
            Circle(SPLIT1_3_OUTLINE_R, mode=Mode.SUBTRACT)
        with Locations((-17.320508076, 10)):
            Circle(SPLIT1_3_OUTLINE_R, mode=Mode.SUBTRACT)
    extrude(amount=SPLIT1_3_DEPTH)

    # Split1 4 outline → Split1 4 (add)
    # profile 1 of 3: a face of its own
    with BuildSketch(Plane(origin=(0, 0, 0), x_dir=(1, 0, 0), z_dir=(0, 1, 0)).offset(SPLIT1_START_3)):
        with Locations((0, -20)):
            Circle(SPLIT1_4_OUTLINE_R)
        with Locations((0, -20)):
            Circle(SPLIT1_4_OUTLINE_R_2, mode=Mode.SUBTRACT)
    # profile 2 of 3: a face of its own
    with BuildSketch(Plane(origin=(0, 0, 0), x_dir=(1, 0, 0), z_dir=(0, 1, 0)).offset(SPLIT1_START_3)):
        with Locations((-17.320508076, 10)):
            Circle(SPLIT1_4_OUTLINE_R)
        with Locations((-17.320508076, 10)):
            Circle(SPLIT1_4_OUTLINE_R_2, mode=Mode.SUBTRACT)
    # profile 3 of 3: a face of its own
    with BuildSketch(Plane(origin=(0, 0, 0), x_dir=(1, 0, 0), z_dir=(0, 1, 0)).offset(SPLIT1_START_3)):
        with Locations((17.320508076, 10)):
            Circle(SPLIT1_4_OUTLINE_R)
        with Locations((17.320508076, 10)):
            Circle(SPLIT1_4_OUTLINE_R_2, mode=Mode.SUBTRACT)
    extrude(amount=SPLIT1_4_DEPTH)

    # Split1 5 outline → Split1 5 (revolve)
    with BuildSketch(Plane.XY.offset(20)):
        with BuildLine():
            ThreePointArc((4.5, 87.5), (5.085786438, 88.914213562), (6.5, 89.5))
            Line((6.5, 89.5), (4.5, 89.5))
            Line((4.5, 89.5), (4.5, 87.5))
        make_face()
    revolve(axis=Axis((0, 0, 20), (0, 1, 0)))

    # Split1 6 outline → Split1 6 (revolve)
    with BuildSketch(Plane(origin=(-17.320508076, 0, -10), x_dir=(1, 0, 0), z_dir=(0, 0, 1))):
        with BuildLine():
            ThreePointArc((4.5, 87.5), (5.085786438, 88.914213562), (6.5, 89.5))
            Line((6.5, 89.5), (4.5, 89.5))
            Line((4.5, 89.5), (4.5, 87.5))
        make_face()
    revolve(axis=Axis((-17.320508076, 0, -10), (0, 1, 0)))

    # Split1 7 outline → Split1 7 (revolve)
    with BuildSketch(Plane(origin=(17.320508076, 0, -10), x_dir=(1, 0, 0), z_dir=(0, 0, 1))):
        with BuildLine():
            ThreePointArc((4.5, 87.5), (5.085786438, 88.914213562), (6.5, 89.5))
            Line((6.5, 89.5), (4.5, 89.5))
            Line((4.5, 89.5), (4.5, 87.5))
        make_face()
    revolve(axis=Axis((17.320508076, 0, -10), (0, 1, 0)))


with BuildPart() as body_3:
    # Split1 8 outline → Split1 8 (new body)
    with BuildSketch(Plane(origin=(0, 0, 0), x_dir=(1, 0, 0), z_dir=(0, 1, 0)).offset(SPLIT1_START)):
        with BuildLine():
            Line((132.5, 12.5), (142.5, 12.5))
            Line((142.5, 12.5), (142.5, 20.5))
            ThreePointArc((142.5, 20.5), (141.914213562, 21.914213562), (140.5, 22.5))
            Line((140.5, 22.5), (132.5, 22.5))
            Line((132.5, 22.5), (132.5, 12.5))
        make_face()
        with BuildLine():
            Line((107.5, 12.5), (107.5, 22.5))
            Line((107.5, 22.5), (99.5, 22.5))
            ThreePointArc((99.5, 22.5), (98.085786438, 21.914213562), (97.5, 20.5))
            Line((97.5, 20.5), (97.5, 12.5))
            Line((97.5, 12.5), (107.5, 12.5))
        make_face()
        with BuildLine():
            ThreePointArc((140.5, -22.5), (141.914213562, -21.914213562), (142.5, -20.5))
            Line((142.5, -20.5), (142.5, -12.5))
            Line((142.5, -12.5), (132.5, -12.5))
            Line((132.5, -12.5), (132.5, -22.5))
            Line((132.5, -22.5), (140.5, -22.5))
        make_face()
        with BuildLine():
            Line((99.5, -22.5), (107.5, -22.5))
            Line((107.5, -22.5), (107.5, -12.5))
            Line((107.5, -12.5), (97.5, -12.5))
            Line((97.5, -12.5), (97.5, -20.5))
            ThreePointArc((97.5, -20.5), (98.085786438, -21.914213562), (99.5, -22.5))
        make_face()
    extrude(amount=SPLIT1_8_DEPTH)

    # Split1 9 outline → Split1 9 (add)
    with BuildSketch(Plane(origin=(0, 0, 0), x_dir=(1, 0, 0), z_dir=(0, 1, 0)).offset(SPLIT1_START_4)):
        with BuildLine():
            Line((140, 20), (140, -22.5))
            Line((140, -22.5), (140.5, -22.5))
            ThreePointArc((140.5, -22.5), (141.914213562, -21.914213562), (142.5, -20.5))
            Line((142.5, -20.5), (142.5, 20.5))
            ThreePointArc((142.5, 20.5), (141.914213562, 21.914213562), (140.5, 22.5))
            Line((140.5, 22.5), (99.5, 22.5))
            ThreePointArc((99.5, 22.5), (98.085786438, 21.914213562), (97.5, 20.5))
            Line((97.5, 20.5), (97.5, -20.5))
            ThreePointArc((97.5, -20.5), (98.085786438, -21.914213562), (99.5, -22.5))
            Line((99.5, -22.5), (100, -22.5))
            Line((100, -22.5), (100, 20))
            Line((100, 20), (140, 20))
        make_face()
    extrude(amount=SPLIT1_9_DEPTH)

    # Split1 10 outline → Split1 10 (add)
    with BuildSketch(Plane(origin=(0, 0, 0), x_dir=(1, 0, 0), z_dir=(0, 1, 0)).offset(SPLIT1_START)):
        Polygon((132.5, 12.5), (132.5, 22.5), (107.5, 22.5), (107.5, 12.5), (97.5, 12.5), (97.5, -12.5), (107.5, -12.5), (107.5, -22.5), (132.5, -22.5), (132.5, -12.5), (142.5, -12.5), (142.5, 12.5), align=None)
    extrude(amount=SPLIT1_10_DEPTH)

    # Split1 11 outline → Split1 11 (add)
    with BuildSketch(Plane(origin=(0, 0, 0), x_dir=(1, 0, 0), z_dir=(0, 1, 0)).offset(SPLIT1_START_4)):
        Polygon((132.5, 12.5), (132.5, 20), (107.5, 20), (107.5, 12.5), (100, 12.5), (100, -12.5), (107.5, -12.5), (107.5, -22.5), (132.5, -22.5), (132.5, -12.5), (140, -12.5), (140, 12.5), align=None)
    extrude(amount=SPLIT1_11_DEPTH)

    # Split1 12 outline → Split1 12 (add)
    with BuildSketch(Plane(origin=(0, 0, 0), x_dir=(1, 0, 0), z_dir=(0, 1, 0)).offset(SPLIT1_START_5)):
        with BuildLine():
            Line((140, 20), (100, 20))
            Line((100, 20), (100, -22.5))
            Line((100, -22.5), (106.5, -22.5))
            ThreePointArc((106.5, -22.5), (107.914213562, -21.914213562), (108.5, -20.5))
            Line((108.5, -20.5), (108.5, 0))
            ThreePointArc((108.5, 0), (120, 11.5), (131.5, 0))
            Line((131.5, 0), (131.5, -20.5))
            ThreePointArc((131.5, -20.5), (132.085786438, -21.914213562), (133.5, -22.5))
            Line((133.5, -22.5), (140, -22.5))
            Line((140, -22.5), (140, 20))
        make_face()
        with Locations((135.5, 15.5)):
            Circle(SPLIT1_12_OUTLINE_R, mode=Mode.SUBTRACT)
        with Locations((104.5, 15.5)):
            Circle(SPLIT1_12_OUTLINE_R, mode=Mode.SUBTRACT)
        with Locations((135.5, -15.5)):
            Circle(SPLIT1_12_OUTLINE_R, mode=Mode.SUBTRACT)
        with Locations((104.5, -15.5)):
            Circle(SPLIT1_12_OUTLINE_R, mode=Mode.SUBTRACT)
    extrude(amount=SPLIT1_12_DEPTH)


solid = Compound([part.part, body_2.part, body_3.part])
